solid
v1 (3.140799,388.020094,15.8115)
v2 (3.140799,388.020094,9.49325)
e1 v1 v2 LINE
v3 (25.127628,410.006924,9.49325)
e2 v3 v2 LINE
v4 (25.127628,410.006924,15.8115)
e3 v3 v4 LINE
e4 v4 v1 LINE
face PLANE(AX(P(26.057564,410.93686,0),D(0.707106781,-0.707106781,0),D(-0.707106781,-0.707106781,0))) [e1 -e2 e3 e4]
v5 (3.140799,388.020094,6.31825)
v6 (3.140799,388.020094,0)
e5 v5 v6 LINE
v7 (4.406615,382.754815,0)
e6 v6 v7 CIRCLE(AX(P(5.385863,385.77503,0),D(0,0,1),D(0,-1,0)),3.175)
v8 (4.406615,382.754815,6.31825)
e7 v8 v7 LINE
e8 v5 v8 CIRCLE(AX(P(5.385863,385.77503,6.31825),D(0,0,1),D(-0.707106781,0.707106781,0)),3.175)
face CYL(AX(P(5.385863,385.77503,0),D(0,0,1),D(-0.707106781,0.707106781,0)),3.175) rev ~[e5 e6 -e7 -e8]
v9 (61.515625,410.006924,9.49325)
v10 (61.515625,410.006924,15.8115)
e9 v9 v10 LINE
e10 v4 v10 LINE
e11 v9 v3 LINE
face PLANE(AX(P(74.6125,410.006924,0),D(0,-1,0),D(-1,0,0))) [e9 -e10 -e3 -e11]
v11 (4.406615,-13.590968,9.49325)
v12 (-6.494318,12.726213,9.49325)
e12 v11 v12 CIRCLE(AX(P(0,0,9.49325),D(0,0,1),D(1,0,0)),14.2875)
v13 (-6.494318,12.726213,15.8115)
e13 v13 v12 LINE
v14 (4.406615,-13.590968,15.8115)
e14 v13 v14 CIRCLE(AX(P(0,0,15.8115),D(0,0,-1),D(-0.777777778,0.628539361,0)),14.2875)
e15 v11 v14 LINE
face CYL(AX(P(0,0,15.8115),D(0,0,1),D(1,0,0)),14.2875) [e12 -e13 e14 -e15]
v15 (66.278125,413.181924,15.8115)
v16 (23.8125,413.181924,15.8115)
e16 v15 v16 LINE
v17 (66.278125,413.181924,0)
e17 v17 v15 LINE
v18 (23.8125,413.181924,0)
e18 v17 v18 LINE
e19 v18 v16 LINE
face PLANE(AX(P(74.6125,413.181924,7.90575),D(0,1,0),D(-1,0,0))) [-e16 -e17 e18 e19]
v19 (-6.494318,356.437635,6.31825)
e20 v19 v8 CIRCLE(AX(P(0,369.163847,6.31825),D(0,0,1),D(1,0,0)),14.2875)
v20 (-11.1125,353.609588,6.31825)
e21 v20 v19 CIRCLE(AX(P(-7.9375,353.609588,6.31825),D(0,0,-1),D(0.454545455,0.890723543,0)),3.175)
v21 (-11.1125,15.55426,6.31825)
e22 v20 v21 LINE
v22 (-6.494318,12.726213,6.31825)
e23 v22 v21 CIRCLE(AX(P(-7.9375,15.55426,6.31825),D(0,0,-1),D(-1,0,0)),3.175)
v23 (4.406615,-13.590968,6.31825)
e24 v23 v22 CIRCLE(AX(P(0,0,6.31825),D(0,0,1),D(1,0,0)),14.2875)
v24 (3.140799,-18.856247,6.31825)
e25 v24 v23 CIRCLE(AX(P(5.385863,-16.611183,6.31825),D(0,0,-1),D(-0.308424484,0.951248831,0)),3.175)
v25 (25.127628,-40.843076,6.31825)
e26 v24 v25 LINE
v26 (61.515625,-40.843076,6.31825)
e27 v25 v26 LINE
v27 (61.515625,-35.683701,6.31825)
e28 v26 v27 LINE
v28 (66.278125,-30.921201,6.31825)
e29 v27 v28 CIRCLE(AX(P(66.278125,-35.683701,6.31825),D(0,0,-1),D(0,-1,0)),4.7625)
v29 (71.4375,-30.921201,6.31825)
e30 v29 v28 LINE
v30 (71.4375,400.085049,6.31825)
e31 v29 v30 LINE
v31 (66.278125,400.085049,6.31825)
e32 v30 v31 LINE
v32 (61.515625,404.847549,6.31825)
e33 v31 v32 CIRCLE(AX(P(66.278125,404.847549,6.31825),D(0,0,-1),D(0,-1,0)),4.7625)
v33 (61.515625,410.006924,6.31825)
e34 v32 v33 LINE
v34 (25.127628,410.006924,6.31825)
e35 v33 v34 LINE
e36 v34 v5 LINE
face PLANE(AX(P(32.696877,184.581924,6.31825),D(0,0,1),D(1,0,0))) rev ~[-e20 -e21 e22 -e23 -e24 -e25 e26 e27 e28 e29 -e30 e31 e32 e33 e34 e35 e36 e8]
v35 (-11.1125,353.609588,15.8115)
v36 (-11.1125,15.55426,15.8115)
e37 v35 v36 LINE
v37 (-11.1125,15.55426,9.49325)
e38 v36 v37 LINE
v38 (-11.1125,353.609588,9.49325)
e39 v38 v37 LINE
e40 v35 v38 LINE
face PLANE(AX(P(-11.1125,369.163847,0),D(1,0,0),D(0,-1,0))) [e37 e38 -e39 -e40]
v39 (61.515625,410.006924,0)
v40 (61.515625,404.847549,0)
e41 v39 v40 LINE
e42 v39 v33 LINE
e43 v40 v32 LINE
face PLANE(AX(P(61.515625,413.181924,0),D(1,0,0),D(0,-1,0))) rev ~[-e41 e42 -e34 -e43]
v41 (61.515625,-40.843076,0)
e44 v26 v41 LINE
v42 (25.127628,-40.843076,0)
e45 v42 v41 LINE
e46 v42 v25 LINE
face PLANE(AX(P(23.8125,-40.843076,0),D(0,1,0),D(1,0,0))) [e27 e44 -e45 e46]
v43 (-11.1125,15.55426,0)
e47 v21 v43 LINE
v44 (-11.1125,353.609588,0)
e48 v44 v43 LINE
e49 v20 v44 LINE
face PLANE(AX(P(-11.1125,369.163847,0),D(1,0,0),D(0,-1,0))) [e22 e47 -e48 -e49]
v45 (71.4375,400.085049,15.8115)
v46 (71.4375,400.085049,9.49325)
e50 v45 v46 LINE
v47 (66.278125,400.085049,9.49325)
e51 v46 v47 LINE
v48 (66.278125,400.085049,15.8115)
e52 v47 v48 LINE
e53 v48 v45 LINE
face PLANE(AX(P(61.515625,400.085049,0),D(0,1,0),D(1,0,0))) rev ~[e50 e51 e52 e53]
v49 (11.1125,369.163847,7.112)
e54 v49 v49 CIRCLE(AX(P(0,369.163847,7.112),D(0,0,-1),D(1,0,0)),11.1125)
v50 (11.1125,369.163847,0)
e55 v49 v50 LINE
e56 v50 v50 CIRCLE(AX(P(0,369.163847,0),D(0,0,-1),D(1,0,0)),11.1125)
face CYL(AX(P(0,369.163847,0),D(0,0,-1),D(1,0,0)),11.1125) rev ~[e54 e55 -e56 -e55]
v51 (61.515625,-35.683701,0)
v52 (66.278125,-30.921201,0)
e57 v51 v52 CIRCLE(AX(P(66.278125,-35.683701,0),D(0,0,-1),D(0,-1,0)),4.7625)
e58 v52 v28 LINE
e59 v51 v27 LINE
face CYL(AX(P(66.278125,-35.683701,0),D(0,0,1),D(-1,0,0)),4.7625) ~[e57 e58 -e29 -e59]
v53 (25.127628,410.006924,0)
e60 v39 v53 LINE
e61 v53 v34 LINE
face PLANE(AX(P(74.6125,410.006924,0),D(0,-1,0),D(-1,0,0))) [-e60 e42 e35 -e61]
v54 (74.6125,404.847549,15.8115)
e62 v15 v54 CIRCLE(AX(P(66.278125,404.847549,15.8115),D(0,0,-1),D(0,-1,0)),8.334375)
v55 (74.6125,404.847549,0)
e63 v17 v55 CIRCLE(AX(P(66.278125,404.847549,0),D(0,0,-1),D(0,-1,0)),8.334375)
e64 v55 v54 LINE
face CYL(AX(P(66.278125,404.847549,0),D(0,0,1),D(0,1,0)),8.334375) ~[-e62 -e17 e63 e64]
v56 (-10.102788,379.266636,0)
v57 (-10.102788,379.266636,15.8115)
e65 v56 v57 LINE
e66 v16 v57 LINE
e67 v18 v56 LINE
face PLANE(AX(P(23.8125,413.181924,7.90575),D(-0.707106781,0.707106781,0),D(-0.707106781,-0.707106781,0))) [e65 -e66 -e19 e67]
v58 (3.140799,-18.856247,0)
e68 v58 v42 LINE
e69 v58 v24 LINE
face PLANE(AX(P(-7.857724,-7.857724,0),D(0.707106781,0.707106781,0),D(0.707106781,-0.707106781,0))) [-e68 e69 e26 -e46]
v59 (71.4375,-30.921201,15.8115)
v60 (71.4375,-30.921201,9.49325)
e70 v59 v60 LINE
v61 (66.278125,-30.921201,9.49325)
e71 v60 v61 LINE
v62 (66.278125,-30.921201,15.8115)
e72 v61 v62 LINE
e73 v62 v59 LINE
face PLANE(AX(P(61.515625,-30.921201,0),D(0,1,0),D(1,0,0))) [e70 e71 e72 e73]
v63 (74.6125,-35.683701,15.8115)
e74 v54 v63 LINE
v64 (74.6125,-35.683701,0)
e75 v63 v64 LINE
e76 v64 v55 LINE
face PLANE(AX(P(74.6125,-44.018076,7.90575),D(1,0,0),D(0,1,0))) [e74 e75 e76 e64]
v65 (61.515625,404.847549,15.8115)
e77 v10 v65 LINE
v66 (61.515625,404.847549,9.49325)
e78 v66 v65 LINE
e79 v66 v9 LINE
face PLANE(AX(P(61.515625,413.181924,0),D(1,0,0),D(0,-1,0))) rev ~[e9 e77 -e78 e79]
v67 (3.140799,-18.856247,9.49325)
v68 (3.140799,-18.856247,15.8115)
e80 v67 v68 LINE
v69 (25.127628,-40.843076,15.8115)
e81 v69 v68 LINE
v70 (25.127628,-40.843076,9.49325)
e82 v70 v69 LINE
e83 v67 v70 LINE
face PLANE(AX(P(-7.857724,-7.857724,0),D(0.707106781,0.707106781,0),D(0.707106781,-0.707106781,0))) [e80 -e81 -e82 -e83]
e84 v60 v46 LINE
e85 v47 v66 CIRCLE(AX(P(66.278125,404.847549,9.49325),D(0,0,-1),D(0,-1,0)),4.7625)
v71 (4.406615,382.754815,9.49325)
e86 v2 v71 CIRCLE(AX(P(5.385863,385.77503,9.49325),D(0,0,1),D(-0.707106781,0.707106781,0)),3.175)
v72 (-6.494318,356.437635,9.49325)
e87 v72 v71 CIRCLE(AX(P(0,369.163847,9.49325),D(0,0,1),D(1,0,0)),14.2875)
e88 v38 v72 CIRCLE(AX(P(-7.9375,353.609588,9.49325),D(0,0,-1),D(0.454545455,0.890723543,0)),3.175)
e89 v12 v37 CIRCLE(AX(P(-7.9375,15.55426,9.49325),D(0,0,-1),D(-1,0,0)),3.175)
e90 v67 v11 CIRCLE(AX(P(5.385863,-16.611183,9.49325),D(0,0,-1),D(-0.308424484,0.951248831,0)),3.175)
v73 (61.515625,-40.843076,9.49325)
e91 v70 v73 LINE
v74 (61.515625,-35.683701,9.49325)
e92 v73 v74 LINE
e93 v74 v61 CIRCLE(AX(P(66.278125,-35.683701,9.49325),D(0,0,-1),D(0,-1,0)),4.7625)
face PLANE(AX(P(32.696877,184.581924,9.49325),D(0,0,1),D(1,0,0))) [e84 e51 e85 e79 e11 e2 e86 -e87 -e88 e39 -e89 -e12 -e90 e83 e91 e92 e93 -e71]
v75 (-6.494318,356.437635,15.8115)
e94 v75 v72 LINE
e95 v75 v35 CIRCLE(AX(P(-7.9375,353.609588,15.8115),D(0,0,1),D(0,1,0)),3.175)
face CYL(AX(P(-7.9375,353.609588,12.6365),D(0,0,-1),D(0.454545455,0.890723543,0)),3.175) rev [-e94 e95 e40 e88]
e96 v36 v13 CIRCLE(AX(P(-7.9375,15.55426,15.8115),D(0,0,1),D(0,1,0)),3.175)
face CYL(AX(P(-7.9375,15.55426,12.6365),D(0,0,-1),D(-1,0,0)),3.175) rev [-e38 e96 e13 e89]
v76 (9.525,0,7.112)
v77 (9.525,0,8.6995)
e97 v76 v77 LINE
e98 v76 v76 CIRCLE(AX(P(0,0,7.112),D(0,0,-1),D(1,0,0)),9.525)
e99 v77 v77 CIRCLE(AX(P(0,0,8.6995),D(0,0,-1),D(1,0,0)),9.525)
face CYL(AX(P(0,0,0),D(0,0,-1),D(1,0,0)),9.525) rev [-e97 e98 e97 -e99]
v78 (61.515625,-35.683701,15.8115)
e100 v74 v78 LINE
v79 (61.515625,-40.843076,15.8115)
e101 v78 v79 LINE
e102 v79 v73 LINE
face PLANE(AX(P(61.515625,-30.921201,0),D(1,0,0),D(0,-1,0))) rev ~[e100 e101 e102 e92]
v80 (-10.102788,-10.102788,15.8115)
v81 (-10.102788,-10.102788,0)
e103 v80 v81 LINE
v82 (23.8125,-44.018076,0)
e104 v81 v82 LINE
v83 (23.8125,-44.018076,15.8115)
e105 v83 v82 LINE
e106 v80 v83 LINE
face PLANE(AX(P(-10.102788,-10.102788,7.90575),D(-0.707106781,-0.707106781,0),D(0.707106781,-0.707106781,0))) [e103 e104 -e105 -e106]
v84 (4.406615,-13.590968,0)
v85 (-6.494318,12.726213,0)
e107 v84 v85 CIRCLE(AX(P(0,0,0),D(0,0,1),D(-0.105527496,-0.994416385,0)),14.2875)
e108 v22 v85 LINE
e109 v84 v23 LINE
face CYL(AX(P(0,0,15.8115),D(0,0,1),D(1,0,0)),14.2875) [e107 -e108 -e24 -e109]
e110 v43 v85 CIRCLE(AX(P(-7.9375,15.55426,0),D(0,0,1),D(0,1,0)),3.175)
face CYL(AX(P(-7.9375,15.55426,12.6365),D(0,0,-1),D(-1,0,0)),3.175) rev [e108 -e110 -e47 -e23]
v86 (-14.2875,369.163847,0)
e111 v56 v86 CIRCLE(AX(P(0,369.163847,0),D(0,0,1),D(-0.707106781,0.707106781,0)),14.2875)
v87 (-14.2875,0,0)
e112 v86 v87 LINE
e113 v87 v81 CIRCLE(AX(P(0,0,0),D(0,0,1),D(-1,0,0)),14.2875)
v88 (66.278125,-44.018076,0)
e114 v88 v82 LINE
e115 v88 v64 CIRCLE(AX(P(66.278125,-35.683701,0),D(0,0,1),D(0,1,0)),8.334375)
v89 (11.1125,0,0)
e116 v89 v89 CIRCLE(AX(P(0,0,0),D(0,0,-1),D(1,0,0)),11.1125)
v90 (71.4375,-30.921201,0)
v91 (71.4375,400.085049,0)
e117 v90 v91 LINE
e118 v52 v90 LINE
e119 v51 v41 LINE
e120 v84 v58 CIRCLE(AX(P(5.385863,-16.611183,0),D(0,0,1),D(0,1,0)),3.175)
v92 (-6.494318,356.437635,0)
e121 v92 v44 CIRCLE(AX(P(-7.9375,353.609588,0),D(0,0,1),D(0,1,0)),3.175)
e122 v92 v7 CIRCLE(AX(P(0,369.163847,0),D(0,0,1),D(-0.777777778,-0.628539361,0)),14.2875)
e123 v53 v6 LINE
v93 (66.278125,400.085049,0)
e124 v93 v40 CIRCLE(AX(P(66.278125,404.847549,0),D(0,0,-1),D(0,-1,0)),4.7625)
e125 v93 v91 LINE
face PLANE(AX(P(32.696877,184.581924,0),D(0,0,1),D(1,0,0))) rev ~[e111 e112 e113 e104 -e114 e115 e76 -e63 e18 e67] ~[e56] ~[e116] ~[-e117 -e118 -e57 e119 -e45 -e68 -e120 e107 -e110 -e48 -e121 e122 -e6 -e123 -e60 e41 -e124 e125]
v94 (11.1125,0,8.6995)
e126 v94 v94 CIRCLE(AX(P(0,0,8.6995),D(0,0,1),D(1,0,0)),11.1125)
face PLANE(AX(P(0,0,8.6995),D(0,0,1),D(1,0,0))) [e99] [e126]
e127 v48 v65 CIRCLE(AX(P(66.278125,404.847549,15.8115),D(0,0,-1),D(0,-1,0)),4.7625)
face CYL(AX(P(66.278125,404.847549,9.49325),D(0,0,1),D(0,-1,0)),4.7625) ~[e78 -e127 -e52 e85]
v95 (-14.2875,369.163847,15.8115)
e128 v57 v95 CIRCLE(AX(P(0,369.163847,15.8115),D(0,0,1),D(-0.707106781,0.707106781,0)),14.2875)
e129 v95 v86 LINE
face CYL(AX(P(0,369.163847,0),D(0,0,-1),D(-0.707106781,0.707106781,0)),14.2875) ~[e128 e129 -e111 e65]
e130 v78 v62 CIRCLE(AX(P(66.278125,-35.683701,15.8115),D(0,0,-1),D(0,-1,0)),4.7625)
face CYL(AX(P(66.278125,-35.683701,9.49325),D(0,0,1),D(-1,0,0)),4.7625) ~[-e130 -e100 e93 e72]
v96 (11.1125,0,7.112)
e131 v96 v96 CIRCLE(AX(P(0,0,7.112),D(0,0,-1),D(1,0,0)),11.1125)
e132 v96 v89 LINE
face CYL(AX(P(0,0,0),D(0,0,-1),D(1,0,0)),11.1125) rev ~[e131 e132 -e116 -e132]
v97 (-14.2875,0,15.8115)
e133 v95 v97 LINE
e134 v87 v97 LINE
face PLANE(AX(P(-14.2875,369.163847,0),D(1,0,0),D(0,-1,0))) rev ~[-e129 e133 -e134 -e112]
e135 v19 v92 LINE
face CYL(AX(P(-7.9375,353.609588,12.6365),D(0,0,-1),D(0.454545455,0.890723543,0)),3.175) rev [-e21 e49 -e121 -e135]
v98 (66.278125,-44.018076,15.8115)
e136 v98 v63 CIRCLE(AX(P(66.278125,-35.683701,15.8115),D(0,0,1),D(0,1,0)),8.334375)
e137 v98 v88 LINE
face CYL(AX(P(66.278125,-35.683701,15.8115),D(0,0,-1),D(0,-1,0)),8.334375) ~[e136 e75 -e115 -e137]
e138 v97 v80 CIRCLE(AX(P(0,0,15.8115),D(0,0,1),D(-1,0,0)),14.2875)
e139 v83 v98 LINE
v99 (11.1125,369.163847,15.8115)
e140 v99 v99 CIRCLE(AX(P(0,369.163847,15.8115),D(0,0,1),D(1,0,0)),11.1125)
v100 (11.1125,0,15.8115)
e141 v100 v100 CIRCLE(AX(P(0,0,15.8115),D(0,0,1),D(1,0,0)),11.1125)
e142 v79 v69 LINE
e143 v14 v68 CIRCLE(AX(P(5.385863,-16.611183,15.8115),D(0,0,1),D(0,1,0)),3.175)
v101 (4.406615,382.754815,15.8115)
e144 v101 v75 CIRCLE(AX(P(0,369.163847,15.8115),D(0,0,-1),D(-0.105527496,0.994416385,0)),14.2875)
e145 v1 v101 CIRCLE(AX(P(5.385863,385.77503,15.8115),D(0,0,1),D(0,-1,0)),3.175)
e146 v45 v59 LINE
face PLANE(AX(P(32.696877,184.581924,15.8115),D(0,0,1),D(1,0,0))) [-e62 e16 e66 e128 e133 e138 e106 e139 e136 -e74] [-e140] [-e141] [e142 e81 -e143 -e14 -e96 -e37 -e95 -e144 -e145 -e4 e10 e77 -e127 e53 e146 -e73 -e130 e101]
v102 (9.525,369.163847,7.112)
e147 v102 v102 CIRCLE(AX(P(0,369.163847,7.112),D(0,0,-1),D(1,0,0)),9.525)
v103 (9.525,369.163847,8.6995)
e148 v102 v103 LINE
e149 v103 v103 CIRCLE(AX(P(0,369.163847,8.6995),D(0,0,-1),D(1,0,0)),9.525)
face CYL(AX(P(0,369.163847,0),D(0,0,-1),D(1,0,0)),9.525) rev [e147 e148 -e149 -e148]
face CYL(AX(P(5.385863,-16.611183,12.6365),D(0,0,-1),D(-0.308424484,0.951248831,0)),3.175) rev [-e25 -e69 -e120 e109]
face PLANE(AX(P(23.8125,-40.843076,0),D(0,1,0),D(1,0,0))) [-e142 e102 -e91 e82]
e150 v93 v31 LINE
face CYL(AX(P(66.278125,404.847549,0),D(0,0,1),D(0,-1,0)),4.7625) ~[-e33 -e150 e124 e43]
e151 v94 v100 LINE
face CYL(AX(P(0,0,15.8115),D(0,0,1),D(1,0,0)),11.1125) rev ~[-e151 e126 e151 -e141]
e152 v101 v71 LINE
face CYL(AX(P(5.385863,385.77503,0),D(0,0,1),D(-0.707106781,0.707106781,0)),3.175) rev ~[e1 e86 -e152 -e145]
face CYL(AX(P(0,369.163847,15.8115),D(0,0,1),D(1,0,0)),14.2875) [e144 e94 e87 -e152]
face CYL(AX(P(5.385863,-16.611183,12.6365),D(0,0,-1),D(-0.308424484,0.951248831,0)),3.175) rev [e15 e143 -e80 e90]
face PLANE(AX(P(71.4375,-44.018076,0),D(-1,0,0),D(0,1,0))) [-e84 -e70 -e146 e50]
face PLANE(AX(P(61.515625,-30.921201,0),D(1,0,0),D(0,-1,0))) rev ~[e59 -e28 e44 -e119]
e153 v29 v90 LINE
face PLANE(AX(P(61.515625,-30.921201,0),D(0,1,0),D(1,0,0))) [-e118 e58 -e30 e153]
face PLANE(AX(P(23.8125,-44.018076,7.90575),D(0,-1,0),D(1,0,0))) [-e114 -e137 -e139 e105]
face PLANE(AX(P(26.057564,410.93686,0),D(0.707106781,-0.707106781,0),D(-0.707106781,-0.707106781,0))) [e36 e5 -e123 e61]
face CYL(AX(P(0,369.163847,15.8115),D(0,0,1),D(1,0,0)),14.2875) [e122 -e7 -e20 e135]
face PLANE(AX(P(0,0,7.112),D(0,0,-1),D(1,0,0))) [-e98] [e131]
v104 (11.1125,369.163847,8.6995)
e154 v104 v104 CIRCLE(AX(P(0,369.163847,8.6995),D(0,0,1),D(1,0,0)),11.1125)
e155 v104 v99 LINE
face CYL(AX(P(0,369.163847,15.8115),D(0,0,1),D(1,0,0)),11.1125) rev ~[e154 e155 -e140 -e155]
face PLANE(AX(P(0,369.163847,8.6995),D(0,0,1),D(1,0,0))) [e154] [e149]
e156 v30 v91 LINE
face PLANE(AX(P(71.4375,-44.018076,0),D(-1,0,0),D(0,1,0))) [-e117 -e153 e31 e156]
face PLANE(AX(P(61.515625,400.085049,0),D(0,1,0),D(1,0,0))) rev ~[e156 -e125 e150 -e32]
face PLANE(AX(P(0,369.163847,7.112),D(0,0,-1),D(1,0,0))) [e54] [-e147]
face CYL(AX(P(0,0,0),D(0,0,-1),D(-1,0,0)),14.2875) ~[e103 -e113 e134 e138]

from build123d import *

# Parameters (mm, degrees)
F0_R      = 9.525
F1_DEPTH  = 15.8115
F2_R      = 11.1125
F3_DEPTH  = 7.112
F4_R      = 11.1125
F5_DEPTH  = 7.112
F6_T      = 3.175
F7_R      = 3.175
F8_DEPTH  = 3.175
F10_R     = 11.1125
F11_DEPTH = 1.5875
F12_W     = 13.096875
F12_H     = 13.096875
F13_DEPTH = 15.8115
F14_R     = 4.7625
F15_R     = 8.334375


# Not quite as in the source:
# - a shell that OpenCascade refuses in one call is made with other operations: the cavity is built on its own and cut out


with BuildPart() as f1:
    # F0 (on Top) → F1 (new body)
    with BuildSketch(Plane.XY):
        with BuildLine():
            Line((-14.2875, 369.1638474552), (-14.2875, 0))
            ThreePointArc((-14.2875, 0), (-13.1999288208, -5.4675895399), (-10.1027881362, -10.1027881362))
            Line((-10.1027881362, -10.1027881362), (23.8125, -44.0180762724))
            Line((23.8125, -44.0180762724), (74.6125, -44.0180762724))
            Line((74.6125, -44.0180762724), (74.6125, 413.1819237276))
            Line((74.6125, 413.1819237276), (23.8125, 413.1819237276))
            Line((23.8125, 413.1819237276), (-10.1027881362, 379.2666355914))
            ThreePointArc((-10.1027881362, 379.2666355914), (-13.1999288208, 374.6314369951), (-14.2875, 369.1638474552))
        make_face()
        Circle(F0_R, mode=Mode.SUBTRACT)
        with Locations((0, 369.1638474552)):
            Circle(F0_R, mode=Mode.SUBTRACT)
    extrude(amount=F1_DEPTH)

    # F2 (on face) → F3 (cut)
    with BuildSketch(Plane.XY.offset(15.8115)):
        with Locations((0, 369.1638474552)):
            Circle(F2_R)
        Circle(F2_R)
    extrude(amount=-F3_DEPTH, mode=Mode.SUBTRACT)

    # F4 (on face) → F5 (cut)
    with BuildSketch(Plane(origin=(0, 0, 0), x_dir=(1, 0, 0), z_dir=(0, 0, -1))):
        Circle(F4_R)
        with Locations((0, -369.1638474552)):
            Circle(F4_R)
    extrude(amount=-F5_DEPTH, mode=Mode.SUBTRACT)

    # F6: shell of thickness 3.175, made by hand


with BuildPart() as f6_core1:
    # F6_t2: copy of F1
    add(f1.part)

    # the walls: a layer under each face that stays
    f6_faces = [f6_core1.faces().sort_by_distance(p)[0] for p in [
        (-13.1999288208, 374.6314369951, 7.90575),
        (6.8548559319, 396.2242796595, 7.90575),
        (-14.2875, 184.5819237276, 7.90575),
        (30.1625, 184.5819237276, 15.8115),
        (49.2125, 413.1819237276, 7.90575),
        (-13.1999288208, -5.4675895399, 7.90575),
        (74.6125, 184.5819237276, 7.90575),
        (6.8548559319, -27.0604322043, 7.90575),
        (49.2125, -44.0180762724, 7.90575),
        (-11.1125, 0, 3.556),
        (-11.1125, 369.1638474552, 3.556),
        (-11.1125, 0, 12.2555),
        (-11.1125, 369.1638474552, 12.2555),
        (-7.4083333333, 7.4083333333, 7.112),
        (-7.4083333333, 376.5721807885, 7.112),
        (-7.4083333333, -7.4083333333, 8.6995),
        (-7.4083333333, 361.7555141219, 8.6995),
        (-9.525, 0, 7.90575),
        (-9.525, 369.1638474552, 7.90575),
    ]]
    thicken(f6_faces, amount=-F6_T, mode=Mode.SUBTRACT)

    # F6_s3 → F6_t4 (revolve, cut)
    with BuildSketch(Plane.XZ):
        Polygon((11.08075, 7.08025), (14.2875, 7.112), (14.2875, 10.287), (11.1125, 10.287), align=None)
    revolve(axis=Axis((0, 0, 7.112), (0, 0, -1)), mode=Mode.SUBTRACT)

    # F6_s5 → F6_t6 (revolve, cut)
    with BuildSketch(Plane.XZ.offset(-369.1638474552)):
        Polygon((11.08075, 7.08025), (14.2875, 7.112), (14.2875, 10.287), (11.1125, 10.287), align=None)
    revolve(axis=Axis((0, 369.1638474552, 7.112), (0, 0, -1)), mode=Mode.SUBTRACT)

    # F6_s7 → F6_t8 (revolve, cut)
    with BuildSketch(Plane.XZ):
        Polygon((11.08075, 8.73125), (14.2875, 8.6995), (14.2875, 5.5245), (11.1125, 5.5245), align=None)
    revolve(axis=Axis((0, 0, 8.6995), (0, 0, 1)), mode=Mode.SUBTRACT)

    # F6_s9 → F6_t10 (revolve, cut)
    with BuildSketch(Plane.XZ.offset(-369.1638474552)):
        Polygon((11.08075, 8.73125), (14.2875, 8.6995), (14.2875, 5.5245), (11.1125, 5.5245), align=None)
    revolve(axis=Axis((0, 369.1638474552, 8.6995), (0, 0, 1)), mode=Mode.SUBTRACT)


with BuildPart() as f1_1:
    add(f1.part)

    # what is left inside the walls is the cavity
    f6_cavity = [f6_core1.part.solids().sort_by_distance(p)[0] for p in [
        (30.1625, 109.440257, 12.60475),
    ]]
    add(f6_cavity, mode=Mode.SUBTRACT)

    # F7
    f7_edges = [f1_1.edges().sort_by_distance(p)[0] for p in [
        (-1.507724, 383.371572, 6.31825),
        (-11.1125, 360.183591, 6.31825),
        (-11.1125, 8.980256, 6.31825),
        (-1.507724, -14.207724, 6.31825),
    ]]
    fillet(f7_edges, radius=F7_R)

    # F8 (cut, through all): a face of the model
    f8_faces = [f1_1.faces().sort_by_distance(p)[0] for p in [
        (32.2546535053, 184.5819237276, 12.6365),
    ]]
    extrude(f8_faces, amount=-F8_DEPTH, mode=Mode.SUBTRACT)

    # F10 (on offset) → F11 (join, symmetric)
    with BuildSketch(Plane.XY.offset(7.90575)):
        with BuildLine():
            Line((74.6125, -44.0180762724), (74.6125, 413.1819237276))
            Line((74.6125, 413.1819237276), (23.8125, 413.1819237276))
            Line((23.8125, 413.1819237276), (-10.1027881362, 379.2666355914))
            ThreePointArc((-10.1027881362, 379.2666355914), (-13.1999288208, 374.6314369951), (-14.2875, 369.1638474552))
            Line((-14.2875, 369.1638474552), (-14.2875, 0))
            ThreePointArc((-14.2875, 0), (-13.1999288208, -5.4675895399), (-10.1027881362, -10.1027881362))
            Line((-10.1027881362, -10.1027881362), (23.8125, -44.0180762724))
            Line((23.8125, -44.0180762724), (74.6125, -44.0180762724))
        make_face()
        Circle(F10_R, mode=Mode.SUBTRACT)
        with Locations((0, 369.1638474552)):
            Circle(F10_R, mode=Mode.SUBTRACT)
    extrude(amount=F11_DEPTH, both=True)

    # F12 (on face) → F13 (join, through all)
    with BuildSketch(Plane(origin=(0, 0, 0), x_dir=(1, 0, 0), z_dir=(0, 0, -1))):
        with Locations((68.0640625, -406.6334862276)):
            Rectangle(F12_W, F12_H)
        with Locations((68.0640625, 37.4696387724)):
            Rectangle(F12_W, F12_H)
    extrude(amount=-F13_DEPTH)

    # F14
    f14_edges = [f1_1.edges().sort_by_distance(p)[0] for p in [
        (61.515625, 400.085049, 12.652375),
        (61.515625, 400.085049, 3.159125),
        (61.515625, -30.921201, 12.652375),
        (61.515625, -30.921201, 3.159125),
    ]]
    fillet(f14_edges, radius=F14_R)

    # F15
    f15_edges = [f1_1.edges().sort_by_distance(p)[0] for p in [
        (74.6125, -44.018076, 7.90575),
        (74.6125, 413.181924, 7.90575),
    ]]
    fillet(f15_edges, radius=F15_R)


solid = f1_1.part
